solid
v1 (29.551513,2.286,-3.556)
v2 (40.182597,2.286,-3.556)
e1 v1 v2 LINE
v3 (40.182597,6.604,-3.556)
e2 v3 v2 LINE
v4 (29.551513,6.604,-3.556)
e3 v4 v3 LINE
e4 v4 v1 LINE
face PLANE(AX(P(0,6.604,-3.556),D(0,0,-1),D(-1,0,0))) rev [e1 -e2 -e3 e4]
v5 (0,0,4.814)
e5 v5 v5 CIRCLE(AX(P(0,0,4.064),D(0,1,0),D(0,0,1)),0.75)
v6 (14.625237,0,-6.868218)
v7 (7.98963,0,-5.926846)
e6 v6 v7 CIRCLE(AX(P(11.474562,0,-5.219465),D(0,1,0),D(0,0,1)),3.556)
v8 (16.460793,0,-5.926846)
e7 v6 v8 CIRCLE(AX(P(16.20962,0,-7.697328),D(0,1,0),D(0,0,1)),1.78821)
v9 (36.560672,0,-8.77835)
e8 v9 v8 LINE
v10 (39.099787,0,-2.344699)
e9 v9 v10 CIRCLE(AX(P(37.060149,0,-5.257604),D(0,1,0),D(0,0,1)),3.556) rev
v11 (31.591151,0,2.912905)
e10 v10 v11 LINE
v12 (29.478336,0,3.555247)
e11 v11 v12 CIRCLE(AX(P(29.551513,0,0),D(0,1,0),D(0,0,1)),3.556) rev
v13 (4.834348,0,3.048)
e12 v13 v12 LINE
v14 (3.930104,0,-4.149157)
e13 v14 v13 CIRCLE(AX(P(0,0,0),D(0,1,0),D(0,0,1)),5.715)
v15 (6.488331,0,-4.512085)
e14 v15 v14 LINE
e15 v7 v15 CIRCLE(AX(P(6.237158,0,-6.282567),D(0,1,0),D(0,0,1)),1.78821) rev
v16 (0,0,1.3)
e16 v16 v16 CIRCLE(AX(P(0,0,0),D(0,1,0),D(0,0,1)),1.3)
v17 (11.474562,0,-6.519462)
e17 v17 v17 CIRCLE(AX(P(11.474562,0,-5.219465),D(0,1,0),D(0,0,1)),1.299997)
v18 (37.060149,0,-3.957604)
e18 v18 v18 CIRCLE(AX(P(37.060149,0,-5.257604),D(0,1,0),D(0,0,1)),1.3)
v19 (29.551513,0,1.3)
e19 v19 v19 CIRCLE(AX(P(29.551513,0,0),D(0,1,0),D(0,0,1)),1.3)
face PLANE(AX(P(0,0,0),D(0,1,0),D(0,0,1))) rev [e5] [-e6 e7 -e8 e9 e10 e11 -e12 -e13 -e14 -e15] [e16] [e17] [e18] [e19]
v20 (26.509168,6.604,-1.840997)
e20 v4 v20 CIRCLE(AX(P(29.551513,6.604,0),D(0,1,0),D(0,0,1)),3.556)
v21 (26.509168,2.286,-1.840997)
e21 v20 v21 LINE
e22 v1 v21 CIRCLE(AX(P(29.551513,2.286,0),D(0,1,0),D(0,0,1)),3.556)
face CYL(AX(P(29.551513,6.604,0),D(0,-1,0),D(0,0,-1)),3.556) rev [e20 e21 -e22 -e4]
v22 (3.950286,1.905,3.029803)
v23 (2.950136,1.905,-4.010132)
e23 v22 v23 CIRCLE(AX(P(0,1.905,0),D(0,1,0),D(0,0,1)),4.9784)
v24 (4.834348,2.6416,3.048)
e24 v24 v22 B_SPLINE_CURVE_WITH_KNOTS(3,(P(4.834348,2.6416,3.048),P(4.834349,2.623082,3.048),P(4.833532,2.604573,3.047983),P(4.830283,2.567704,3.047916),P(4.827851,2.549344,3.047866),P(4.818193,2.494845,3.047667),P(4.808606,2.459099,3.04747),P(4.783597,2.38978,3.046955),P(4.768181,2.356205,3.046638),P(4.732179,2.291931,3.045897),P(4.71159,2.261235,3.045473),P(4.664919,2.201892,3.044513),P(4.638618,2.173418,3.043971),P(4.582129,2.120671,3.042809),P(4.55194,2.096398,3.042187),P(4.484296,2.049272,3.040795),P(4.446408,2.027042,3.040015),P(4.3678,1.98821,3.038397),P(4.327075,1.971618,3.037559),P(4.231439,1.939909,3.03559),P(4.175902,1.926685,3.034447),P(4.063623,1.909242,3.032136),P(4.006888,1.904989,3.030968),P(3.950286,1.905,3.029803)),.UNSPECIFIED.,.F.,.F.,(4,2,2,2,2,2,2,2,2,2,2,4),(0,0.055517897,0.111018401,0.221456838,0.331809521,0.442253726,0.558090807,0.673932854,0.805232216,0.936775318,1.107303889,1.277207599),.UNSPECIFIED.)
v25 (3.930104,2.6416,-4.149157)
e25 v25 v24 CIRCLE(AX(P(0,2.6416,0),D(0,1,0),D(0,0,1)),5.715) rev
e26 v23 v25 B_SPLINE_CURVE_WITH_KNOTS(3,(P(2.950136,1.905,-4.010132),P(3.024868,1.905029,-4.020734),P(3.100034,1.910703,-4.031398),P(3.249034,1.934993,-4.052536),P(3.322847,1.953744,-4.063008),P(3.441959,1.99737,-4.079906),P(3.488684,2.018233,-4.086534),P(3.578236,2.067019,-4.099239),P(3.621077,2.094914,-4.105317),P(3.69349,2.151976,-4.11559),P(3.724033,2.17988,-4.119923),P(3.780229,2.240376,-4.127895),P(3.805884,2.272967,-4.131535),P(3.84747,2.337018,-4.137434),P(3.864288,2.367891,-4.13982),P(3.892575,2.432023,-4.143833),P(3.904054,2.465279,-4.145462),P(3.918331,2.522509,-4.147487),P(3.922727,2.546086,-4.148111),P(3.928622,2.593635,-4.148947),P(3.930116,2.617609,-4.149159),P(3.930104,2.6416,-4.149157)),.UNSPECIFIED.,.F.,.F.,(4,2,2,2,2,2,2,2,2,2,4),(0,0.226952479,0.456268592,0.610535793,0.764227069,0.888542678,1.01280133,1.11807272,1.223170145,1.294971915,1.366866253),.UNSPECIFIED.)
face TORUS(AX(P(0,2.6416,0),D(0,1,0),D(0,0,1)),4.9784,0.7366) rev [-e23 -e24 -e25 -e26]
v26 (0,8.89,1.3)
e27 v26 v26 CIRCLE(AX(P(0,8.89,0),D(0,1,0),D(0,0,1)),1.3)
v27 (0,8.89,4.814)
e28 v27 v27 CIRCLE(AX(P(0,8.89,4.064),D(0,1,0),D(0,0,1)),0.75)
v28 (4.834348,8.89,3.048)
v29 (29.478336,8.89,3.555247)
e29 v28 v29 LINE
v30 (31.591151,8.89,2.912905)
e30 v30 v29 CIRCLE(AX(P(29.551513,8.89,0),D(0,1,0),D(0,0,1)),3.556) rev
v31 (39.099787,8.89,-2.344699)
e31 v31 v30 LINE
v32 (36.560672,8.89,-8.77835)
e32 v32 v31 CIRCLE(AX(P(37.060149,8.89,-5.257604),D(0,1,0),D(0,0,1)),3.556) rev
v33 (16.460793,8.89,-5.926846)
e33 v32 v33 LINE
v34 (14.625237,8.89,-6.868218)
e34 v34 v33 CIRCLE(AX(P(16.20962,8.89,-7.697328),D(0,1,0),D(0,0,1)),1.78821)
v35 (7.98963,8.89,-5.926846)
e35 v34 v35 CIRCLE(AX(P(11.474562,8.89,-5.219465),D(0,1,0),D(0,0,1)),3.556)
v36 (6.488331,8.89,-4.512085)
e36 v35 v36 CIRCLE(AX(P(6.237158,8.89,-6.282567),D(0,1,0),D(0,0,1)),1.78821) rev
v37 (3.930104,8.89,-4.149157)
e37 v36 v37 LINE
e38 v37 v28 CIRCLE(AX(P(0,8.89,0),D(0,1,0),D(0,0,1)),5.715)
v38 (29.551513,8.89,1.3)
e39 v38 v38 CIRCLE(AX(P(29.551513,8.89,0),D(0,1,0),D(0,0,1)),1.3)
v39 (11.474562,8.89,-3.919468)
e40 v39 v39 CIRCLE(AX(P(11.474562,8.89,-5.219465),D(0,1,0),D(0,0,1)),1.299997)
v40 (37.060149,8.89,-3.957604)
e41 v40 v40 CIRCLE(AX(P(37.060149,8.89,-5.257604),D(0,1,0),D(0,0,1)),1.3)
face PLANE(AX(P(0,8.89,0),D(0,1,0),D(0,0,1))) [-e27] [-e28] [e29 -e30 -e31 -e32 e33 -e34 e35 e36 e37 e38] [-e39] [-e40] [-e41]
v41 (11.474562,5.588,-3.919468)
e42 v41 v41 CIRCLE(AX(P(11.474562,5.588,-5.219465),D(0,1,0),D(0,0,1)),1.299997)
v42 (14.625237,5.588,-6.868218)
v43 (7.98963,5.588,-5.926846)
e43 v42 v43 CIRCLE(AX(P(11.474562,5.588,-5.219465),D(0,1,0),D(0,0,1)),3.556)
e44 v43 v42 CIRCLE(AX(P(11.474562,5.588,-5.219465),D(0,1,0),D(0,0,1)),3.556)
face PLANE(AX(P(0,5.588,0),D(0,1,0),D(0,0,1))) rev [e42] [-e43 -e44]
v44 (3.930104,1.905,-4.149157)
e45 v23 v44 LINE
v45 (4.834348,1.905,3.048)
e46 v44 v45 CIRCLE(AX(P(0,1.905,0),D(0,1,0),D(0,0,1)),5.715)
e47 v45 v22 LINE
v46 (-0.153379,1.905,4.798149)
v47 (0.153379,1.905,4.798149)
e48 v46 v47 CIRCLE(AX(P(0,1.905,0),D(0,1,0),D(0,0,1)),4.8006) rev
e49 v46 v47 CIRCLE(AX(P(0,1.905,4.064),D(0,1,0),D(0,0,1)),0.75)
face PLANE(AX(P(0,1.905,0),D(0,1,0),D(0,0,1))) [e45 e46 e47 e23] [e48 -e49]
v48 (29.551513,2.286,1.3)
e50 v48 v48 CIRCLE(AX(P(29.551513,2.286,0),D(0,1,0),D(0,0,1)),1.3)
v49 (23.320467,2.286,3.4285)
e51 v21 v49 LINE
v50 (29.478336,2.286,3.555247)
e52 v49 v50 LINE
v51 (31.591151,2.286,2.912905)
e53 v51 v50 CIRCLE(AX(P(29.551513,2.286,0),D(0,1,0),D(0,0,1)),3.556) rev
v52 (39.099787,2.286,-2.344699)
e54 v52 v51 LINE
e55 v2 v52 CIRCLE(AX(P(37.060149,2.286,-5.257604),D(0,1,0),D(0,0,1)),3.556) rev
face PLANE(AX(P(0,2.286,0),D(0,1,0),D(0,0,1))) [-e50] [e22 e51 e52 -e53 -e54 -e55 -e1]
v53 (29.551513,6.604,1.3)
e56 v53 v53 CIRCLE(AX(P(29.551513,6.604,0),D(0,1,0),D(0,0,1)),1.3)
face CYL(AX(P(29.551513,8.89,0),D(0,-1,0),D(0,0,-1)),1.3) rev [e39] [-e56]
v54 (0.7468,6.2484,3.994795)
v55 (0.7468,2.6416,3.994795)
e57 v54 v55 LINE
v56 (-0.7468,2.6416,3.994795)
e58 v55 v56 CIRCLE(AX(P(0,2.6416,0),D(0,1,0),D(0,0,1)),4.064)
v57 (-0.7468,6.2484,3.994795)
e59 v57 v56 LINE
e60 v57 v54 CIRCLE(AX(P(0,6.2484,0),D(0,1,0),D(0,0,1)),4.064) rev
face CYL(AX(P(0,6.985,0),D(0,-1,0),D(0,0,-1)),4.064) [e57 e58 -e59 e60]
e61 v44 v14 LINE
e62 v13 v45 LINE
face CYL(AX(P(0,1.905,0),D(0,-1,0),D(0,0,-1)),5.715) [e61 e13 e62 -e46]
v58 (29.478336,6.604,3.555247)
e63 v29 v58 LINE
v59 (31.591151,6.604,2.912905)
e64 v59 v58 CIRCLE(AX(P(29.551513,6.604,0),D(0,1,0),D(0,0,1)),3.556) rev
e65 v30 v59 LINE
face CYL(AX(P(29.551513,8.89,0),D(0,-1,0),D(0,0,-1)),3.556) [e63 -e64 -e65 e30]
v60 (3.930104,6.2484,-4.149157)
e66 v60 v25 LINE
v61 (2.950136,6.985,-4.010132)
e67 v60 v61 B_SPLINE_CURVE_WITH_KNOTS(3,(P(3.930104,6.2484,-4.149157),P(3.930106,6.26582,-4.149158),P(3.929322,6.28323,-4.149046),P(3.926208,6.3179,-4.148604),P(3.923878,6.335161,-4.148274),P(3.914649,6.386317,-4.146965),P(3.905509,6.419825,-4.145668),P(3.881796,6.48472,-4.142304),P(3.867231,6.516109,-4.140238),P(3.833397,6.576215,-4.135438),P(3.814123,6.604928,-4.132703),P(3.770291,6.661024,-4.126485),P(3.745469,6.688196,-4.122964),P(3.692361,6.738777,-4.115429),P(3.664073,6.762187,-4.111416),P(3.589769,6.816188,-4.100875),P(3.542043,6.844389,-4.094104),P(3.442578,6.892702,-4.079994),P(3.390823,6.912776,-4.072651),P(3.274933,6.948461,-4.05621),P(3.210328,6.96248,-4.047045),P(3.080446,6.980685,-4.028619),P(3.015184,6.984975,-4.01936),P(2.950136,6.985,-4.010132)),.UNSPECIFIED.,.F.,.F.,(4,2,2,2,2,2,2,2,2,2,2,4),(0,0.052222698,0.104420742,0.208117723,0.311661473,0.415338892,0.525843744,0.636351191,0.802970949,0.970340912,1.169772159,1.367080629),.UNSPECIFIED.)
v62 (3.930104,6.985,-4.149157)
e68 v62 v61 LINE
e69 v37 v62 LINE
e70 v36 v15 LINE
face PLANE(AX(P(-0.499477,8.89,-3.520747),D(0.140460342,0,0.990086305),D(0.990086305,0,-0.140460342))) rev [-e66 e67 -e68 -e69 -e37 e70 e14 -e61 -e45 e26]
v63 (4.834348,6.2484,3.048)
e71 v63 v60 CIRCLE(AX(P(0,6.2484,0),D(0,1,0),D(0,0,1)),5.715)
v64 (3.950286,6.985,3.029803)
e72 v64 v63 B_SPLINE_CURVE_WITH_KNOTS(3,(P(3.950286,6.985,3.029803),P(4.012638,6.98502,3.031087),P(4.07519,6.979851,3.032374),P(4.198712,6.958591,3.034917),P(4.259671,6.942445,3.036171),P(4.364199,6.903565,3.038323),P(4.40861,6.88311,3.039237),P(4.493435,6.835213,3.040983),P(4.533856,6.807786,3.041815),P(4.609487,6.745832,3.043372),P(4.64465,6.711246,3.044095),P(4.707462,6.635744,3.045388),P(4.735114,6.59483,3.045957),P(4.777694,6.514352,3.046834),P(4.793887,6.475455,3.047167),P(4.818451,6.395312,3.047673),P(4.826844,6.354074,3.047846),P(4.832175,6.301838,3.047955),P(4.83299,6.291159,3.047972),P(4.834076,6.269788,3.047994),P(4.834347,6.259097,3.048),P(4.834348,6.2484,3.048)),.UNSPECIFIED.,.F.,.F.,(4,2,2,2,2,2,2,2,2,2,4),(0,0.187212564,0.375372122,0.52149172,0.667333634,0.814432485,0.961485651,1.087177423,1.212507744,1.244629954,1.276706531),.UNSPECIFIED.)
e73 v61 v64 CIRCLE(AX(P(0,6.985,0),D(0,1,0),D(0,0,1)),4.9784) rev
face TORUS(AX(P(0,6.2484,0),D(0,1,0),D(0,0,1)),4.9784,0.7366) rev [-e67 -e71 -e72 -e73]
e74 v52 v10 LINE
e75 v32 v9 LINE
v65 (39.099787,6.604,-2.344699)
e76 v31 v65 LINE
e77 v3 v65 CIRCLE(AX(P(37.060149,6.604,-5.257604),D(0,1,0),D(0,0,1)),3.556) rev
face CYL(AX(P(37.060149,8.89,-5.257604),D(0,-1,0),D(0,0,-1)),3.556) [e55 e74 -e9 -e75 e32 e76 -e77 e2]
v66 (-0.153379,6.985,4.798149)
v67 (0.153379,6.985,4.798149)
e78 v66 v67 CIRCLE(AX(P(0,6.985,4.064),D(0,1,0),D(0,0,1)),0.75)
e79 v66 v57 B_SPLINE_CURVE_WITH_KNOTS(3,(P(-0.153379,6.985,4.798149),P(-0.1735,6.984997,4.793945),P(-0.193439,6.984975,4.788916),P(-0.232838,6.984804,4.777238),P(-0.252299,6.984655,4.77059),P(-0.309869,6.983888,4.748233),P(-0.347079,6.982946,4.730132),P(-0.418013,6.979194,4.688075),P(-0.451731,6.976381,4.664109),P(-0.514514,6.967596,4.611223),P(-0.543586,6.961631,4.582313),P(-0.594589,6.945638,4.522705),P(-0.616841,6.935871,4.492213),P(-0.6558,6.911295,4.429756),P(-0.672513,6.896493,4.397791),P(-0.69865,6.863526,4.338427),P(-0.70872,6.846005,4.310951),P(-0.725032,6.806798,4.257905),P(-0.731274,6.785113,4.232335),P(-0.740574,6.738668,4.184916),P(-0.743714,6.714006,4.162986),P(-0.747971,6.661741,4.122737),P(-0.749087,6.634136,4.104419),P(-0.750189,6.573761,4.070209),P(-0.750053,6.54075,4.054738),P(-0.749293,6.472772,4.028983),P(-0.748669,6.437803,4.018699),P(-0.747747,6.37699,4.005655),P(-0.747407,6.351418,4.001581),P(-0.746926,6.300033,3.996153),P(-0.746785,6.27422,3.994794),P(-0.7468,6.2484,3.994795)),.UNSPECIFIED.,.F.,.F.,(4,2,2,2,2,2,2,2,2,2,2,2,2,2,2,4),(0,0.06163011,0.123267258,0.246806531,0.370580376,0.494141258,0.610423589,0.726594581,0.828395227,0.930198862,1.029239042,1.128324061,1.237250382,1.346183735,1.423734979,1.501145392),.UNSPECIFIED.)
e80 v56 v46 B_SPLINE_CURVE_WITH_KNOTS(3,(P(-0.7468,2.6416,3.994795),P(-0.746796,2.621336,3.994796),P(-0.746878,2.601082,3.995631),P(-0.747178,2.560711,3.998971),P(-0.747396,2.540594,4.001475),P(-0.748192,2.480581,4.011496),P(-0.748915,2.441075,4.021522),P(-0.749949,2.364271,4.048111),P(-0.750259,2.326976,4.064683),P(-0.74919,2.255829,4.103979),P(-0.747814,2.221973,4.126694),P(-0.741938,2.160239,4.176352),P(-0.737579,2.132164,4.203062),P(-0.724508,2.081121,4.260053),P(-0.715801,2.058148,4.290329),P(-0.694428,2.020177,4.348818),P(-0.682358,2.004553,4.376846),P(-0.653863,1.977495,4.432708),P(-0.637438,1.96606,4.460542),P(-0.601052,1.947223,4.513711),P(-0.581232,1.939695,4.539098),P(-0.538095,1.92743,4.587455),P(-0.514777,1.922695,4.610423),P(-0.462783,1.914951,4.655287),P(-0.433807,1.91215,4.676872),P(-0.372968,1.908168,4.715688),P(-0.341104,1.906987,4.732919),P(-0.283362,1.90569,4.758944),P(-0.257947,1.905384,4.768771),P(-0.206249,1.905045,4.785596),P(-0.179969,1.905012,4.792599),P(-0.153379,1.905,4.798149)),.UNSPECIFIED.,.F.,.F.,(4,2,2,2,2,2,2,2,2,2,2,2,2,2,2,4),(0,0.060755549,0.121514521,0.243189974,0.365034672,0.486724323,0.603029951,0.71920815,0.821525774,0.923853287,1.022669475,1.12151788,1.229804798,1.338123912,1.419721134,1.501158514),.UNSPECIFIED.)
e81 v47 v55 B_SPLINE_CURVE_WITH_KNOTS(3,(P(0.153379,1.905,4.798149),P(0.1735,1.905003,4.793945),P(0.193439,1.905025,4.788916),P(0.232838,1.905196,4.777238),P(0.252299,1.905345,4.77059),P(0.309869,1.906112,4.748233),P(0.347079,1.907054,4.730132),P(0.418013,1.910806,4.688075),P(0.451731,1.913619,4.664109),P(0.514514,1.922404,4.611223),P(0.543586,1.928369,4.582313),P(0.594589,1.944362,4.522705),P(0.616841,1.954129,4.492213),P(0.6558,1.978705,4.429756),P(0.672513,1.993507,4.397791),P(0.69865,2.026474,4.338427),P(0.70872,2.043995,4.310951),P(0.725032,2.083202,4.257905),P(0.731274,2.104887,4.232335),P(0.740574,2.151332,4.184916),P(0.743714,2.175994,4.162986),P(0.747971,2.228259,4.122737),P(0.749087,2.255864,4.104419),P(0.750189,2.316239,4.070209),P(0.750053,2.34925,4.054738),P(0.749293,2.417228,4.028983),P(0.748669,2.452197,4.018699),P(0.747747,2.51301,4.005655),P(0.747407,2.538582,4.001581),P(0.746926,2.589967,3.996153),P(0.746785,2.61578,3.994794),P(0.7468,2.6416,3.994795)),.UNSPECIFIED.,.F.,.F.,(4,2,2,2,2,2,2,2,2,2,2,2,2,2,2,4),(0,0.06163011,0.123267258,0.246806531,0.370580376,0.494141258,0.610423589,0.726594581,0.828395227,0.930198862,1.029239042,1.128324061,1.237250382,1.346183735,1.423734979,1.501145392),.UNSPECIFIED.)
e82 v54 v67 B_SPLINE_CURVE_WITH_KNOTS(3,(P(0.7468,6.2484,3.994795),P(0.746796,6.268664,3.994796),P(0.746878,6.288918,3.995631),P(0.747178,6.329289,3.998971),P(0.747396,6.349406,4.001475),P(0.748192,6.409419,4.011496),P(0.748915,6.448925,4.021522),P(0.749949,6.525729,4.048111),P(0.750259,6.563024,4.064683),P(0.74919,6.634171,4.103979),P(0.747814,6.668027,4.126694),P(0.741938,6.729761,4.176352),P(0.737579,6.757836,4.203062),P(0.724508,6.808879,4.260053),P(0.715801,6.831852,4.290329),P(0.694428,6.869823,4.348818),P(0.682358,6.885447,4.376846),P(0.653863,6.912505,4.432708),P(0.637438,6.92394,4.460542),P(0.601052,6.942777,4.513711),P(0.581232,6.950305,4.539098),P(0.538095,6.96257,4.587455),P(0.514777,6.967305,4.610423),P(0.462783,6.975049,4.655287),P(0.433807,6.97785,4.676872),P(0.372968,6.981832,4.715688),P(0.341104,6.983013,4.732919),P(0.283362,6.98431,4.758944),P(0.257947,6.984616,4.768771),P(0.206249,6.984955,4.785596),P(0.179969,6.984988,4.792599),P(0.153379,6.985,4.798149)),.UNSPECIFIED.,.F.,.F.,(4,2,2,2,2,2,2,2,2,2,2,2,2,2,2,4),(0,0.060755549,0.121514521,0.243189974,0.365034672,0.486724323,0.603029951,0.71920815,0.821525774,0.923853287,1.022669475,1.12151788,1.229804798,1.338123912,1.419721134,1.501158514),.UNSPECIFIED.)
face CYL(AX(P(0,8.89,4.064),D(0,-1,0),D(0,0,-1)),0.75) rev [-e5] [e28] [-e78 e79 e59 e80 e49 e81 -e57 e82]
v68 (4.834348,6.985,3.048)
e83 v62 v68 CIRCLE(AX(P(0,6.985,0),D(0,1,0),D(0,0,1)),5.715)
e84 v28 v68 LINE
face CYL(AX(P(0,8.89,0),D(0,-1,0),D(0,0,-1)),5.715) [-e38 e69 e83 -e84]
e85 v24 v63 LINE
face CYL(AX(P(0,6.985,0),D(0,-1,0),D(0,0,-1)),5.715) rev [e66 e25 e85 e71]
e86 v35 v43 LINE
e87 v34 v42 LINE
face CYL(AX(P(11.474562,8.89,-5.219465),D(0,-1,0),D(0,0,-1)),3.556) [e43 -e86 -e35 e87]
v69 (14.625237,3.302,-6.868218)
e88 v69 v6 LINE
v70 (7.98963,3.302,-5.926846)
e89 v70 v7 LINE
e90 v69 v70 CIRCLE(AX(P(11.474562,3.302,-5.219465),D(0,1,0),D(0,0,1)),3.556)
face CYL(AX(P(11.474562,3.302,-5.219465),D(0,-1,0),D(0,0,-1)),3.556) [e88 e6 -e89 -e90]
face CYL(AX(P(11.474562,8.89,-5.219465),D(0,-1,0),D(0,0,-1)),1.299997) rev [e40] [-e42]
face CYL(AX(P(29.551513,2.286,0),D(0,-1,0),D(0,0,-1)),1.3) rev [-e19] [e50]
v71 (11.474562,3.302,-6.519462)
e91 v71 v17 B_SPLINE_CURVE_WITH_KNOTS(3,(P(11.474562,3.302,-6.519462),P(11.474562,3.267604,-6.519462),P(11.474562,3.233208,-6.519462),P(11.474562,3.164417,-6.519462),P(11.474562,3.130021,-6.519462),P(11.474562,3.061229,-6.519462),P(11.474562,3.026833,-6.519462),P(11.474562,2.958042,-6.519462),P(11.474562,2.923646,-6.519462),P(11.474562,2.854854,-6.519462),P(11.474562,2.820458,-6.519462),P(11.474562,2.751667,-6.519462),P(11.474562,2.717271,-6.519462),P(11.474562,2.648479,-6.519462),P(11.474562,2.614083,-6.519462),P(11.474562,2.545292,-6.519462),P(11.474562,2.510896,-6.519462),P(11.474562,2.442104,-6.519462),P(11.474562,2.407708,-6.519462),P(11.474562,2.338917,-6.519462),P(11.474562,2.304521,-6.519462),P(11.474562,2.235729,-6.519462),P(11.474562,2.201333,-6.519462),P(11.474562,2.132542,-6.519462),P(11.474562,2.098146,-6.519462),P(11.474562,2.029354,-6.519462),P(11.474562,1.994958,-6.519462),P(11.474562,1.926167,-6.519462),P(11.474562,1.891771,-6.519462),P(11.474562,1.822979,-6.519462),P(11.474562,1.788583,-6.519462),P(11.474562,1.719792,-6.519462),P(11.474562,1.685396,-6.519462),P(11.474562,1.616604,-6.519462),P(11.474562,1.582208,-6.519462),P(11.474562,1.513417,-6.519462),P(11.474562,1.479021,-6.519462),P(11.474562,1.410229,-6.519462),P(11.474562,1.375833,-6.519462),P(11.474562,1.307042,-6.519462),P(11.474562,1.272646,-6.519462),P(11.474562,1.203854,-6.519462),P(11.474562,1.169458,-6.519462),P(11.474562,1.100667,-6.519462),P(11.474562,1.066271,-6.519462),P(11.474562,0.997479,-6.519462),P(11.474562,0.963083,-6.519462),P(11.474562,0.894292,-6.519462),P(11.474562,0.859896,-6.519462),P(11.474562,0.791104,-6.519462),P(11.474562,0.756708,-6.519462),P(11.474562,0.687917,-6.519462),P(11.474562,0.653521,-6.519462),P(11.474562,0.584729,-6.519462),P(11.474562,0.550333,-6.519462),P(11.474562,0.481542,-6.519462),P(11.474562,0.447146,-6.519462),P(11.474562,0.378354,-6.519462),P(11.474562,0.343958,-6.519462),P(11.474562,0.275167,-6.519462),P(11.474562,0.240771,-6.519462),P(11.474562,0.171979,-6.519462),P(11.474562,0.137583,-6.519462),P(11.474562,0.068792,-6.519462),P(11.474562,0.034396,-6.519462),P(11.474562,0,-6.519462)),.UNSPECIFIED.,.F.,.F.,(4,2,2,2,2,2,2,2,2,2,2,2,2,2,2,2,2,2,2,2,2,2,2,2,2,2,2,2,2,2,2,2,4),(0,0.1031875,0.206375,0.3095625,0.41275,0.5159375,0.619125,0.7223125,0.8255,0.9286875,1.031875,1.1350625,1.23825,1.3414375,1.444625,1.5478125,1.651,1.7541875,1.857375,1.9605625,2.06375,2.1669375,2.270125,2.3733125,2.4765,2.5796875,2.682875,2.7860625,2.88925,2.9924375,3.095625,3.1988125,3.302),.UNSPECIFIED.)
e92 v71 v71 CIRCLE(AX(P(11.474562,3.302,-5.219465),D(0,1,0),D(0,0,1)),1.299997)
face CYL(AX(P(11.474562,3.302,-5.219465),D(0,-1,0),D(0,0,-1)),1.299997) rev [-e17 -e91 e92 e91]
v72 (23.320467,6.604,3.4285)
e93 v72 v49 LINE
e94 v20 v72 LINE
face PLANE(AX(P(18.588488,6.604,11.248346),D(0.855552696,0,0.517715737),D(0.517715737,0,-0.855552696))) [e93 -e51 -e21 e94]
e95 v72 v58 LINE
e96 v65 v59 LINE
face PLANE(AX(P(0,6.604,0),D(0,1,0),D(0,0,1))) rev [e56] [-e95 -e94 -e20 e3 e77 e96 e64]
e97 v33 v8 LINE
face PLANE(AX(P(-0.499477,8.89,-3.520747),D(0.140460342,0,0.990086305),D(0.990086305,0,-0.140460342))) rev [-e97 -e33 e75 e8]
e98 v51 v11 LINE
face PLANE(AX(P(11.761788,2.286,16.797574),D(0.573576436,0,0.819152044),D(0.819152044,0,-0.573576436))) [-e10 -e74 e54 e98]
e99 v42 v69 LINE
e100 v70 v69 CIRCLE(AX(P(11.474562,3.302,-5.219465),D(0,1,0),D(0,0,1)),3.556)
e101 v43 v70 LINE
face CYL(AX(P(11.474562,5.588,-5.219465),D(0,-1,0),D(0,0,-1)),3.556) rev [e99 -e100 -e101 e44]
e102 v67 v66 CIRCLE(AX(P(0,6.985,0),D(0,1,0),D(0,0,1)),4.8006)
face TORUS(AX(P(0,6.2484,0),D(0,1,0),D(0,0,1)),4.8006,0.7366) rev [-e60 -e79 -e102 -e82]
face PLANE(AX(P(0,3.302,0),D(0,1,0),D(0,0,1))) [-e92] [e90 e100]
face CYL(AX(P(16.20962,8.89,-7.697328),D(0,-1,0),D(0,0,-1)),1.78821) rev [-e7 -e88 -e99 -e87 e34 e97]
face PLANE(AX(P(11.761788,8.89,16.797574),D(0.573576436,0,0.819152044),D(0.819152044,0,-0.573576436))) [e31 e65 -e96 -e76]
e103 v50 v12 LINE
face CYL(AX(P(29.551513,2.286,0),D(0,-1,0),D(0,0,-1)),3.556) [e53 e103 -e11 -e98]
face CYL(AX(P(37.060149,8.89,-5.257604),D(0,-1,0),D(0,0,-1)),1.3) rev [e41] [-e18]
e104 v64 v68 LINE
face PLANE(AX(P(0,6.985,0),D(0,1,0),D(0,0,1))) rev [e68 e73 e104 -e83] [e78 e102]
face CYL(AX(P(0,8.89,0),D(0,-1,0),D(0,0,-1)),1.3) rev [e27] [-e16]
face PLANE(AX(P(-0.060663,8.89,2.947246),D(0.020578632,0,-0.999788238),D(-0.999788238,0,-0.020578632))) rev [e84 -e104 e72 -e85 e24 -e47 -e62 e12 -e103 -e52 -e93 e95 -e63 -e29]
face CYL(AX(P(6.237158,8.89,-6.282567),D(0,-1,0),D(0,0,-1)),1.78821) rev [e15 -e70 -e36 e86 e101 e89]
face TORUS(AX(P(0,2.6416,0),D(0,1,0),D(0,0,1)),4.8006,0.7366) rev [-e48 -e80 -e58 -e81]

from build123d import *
from build123d.topology import SkipClean

# Parameters (mm, degrees)
SKETCH1_R           = 1.3
SKETCH1_R_2         = 0.75
SKETCH1_R_3         = 1.2999974
BOSS_EXTRUDE1_DEPTH = 8.89
SKETCH1_3_R         = 5.715
SKETCH1_3_R_2       = 4.064
CUT_EXTRUDE1_DEPTH  = 6.985
BOSS_EXTRUDE2_DEPTH = 1.905
FILLET4_R           = 0.7366
SKETCH1_5_R         = 1.2999974
CUT_EXTRUDE2_DEPTH  = 5.588
SKETCH1_6_R         = 1.2999974
BOSS_EXTRUDE3_DEPTH = 3.302
CUT_EXTRUDE3_DEPTH  = 6.604
BOSS_EXTRUDE4_DEPTH = 2.286


with BuildPart() as part:
    # Sketch1 → Boss-Extrude1 (new body)
    with BuildSketch(Plane(origin=(0, 0, 0), x_dir=(1, 0, 0), z_dir=(0, 1, 0))):
        with BuildLine():
            ThreePointArc((3.930104201, 4.14915726), (-5.670420967, -0.712426178), (4.834348043, -3.048))
            Line((4.834348043, -3.048), (29.478335544, -3.555246973))
            ThreePointArc((29.478335544, -3.555246973), (30.585869157, -3.402240978), (31.591150968, -2.912904669))
            Line((31.591150968, -2.912904669), (39.099786947, 2.344698845))
            ThreePointArc((39.099786947, 2.344698845), (40.367866174, 6.563032187), (36.560672162, 8.778350417))
            Line((36.560672162, 8.778350417), (16.46079264, 5.926845507))
            ThreePointArc((16.46079264, 5.926845507), (15.393588111, 6.106168793), (14.625236588, 6.868217534))
            ThreePointArc((14.625236588, 6.868217534), (10.975084871, 8.740211971), (7.989630154, 5.926845507))
            ThreePointArc((7.989630154, 5.926845507), (7.463549388, 4.981159844), (6.488331058, 4.512084631))
            Line((6.488331058, 4.512084631), (3.930104201, 4.14915726))
        make_face()
        with Locations(Location((0, 0, 0), (0, 0, 270))):
            Circle(SKETCH1_R, mode=Mode.SUBTRACT)
        with Locations(Location((0, -4.064, 0), (0, 0, 270))):
            Circle(SKETCH1_R_2, mode=Mode.SUBTRACT)
        with Locations(Location((29.55151316, 0, 0), (0, 0, 270))):
            Circle(SKETCH1_R, mode=Mode.SUBTRACT)
        with Locations(Location((37.060149139, 5.257603514, 0), (0, 0, 270))):
            Circle(SKETCH1_R, mode=Mode.SUBTRACT)
        with Locations(Location((11.474561849, 5.219465069, 0), (0, 0, 270))):
            Circle(SKETCH1_R_3, mode=Mode.SUBTRACT)
    extrude(amount=BOSS_EXTRUDE1_DEPTH)

    # Sketch1<3> → Cut-Extrude1 (cut)
    with BuildSketch(Plane(origin=(0, 0, 0), x_dir=(1, 0, 0), z_dir=(0, 1, 0))):
        Circle(SKETCH1_3_R)
        Circle(SKETCH1_3_R_2, mode=Mode.SUBTRACT)
    extrude(amount=CUT_EXTRUDE1_DEPTH, mode=Mode.SUBTRACT)

    # Sketch1<4> → Boss-Extrude2 (add)
    with SkipClean():  # the faces are left unmerged after this step: merging them gives an invalid solid
        with BuildSketch(Plane(origin=(0, 0, 0), x_dir=(1, 0, 0), z_dir=(0, 1, 0))):
            with BuildLine():
                Line((5.715, 0), (4.064, 0))
                ThreePointArc((4.064, 0), (3.12658698, -2.596256894), (0.746800266, -3.994794783))
                ThreePointArc((0.746800266, -3.994794783), (0.74919964, -4.029360426), (0.75, -4.064))
                ThreePointArc((0.75, -4.064), (-0.034639574, -4.81319964), (-0.746800266, -3.994794783))
                ThreePointArc((-0.746800266, -3.994794783), (-2.80994126, 2.936039188), (4.023710745, 0.570830832))
                Line((4.023710745, 0.570830832), (5.658343236, 0.802730857))
                ThreePointArc((5.658343236, 0.802730857), (5.077816803, 2.622403768), (3.930104201, 4.14915726))
                ThreePointArc((3.930104201, 4.14915726), (-5.670420967, -0.712426178), (4.834348043, -3.048))
                ThreePointArc((4.834348043, -3.048), (5.490424577, -1.586336335), (5.715, 0))
            make_face()
            with BuildLine():
                ThreePointArc((4.023710745, 0.570830832), (4.053915174, 0.286125437), (4.064, 0))
                Line((4.064, 0), (5.715, 0))
                ThreePointArc((5.715, 0), (5.700818213, 0.402363896), (5.658343236, 0.802730857))
                Line((5.658343236, 0.802730857), (4.023710745, 0.570830832))
            make_face()
        extrude(amount=BOSS_EXTRUDE2_DEPTH)

    # Fillet4
    # the kernel refuses this fillet: 0.7366 mm, written as the material it adds along each edge
    with BuildSketch(Plane(origin=(0, 6.985, 0), x_dir=(0.0031415874858795557, 0, 0.9999950652018581), z_dir=(-0.9999950652018581, 0, 0.0031415874858795557))) as fillet4_piece_1_section:
        with BuildLine():
            CenterArc((4.064 + FILLET4_R, -FILLET4_R), FILLET4_R, 90, 90)
            Line((4.064, -FILLET4_R), (4.064, 0))
            Line((4.064, 0), (4.064 + FILLET4_R, 0))
        make_face()
    fillet4_piece_1 = revolve(axis=Axis((0, 6.985, 0), (0, 1, 0)), revolution_arc=359.64, mode=Mode.PRIVATE)
    fillet4_piece_1 = fillet4_piece_1 - Plane(origin=(0, 6.77936554, 4.064), x_dir=(0, 0, 1), z_dir=(0, -1, 0)) * Cylinder(0.75, 20, mode=Mode.PRIVATE)
    add(fillet4_piece_1)
    with BuildSketch(Plane(origin=(0, 6.985, 0), x_dir=(0.6333996635082028, 0, 0.7738248291879084), z_dir=(-0.7738248291879084, 0, 0.6333996635082028))) as fillet4_piece_2_section:
        with BuildLine():
            CenterArc((5.715 - FILLET4_R, -FILLET4_R), FILLET4_R, 0, 90)
            Line((5.715 - FILLET4_R, 0), (5.715, 0))
            Line((5.715, 0), (5.715, -FILLET4_R))
        make_face()
    fillet4_piece_2 = revolve(axis=Axis((0, 6.985, 0), (0, 1, 0)), revolution_arc=115.719345032, mode=Mode.PRIVATE)
    fillet4_piece_2 = split(fillet4_piece_2, bisect_by=Plane(origin=(4.95205857, 6.776121662, -4.294138621), z_dir=(0.14046034244219252, 0, 0.9900863054305024)), keep=Keep.TOP, mode=Mode.PRIVATE)
    fillet4_piece_2 = split(fillet4_piece_2, bisect_by=Plane(origin=(5.372477219, 6.776121662, 3.059076308), z_dir=(0.020578632283041045, 0, -0.9997882375250068)), keep=Keep.TOP, mode=Mode.PRIVATE)
    add(fillet4_piece_2)
    with BuildSketch(Plane(origin=(0, 1.905, 0), x_dir=(-0.00314158748587942, 0, 0.9999950652018581), z_dir=(0.9999950652018581, 0, 0.00314158748587942))) as fillet4_piece_3_section:
        with BuildLine():
            CenterArc((4.064 + FILLET4_R, -FILLET4_R), FILLET4_R, 90, 90)
            Line((4.064, -FILLET4_R), (4.064, 0))
            Line((4.064, 0), (4.064 + FILLET4_R, 0))
        make_face()
    fillet4_piece_3 = revolve(axis=Axis((0, 1.905, 0), (0, -1, 0)), revolution_arc=359.64, mode=Mode.PRIVATE)
    fillet4_piece_3 = fillet4_piece_3 - Plane(origin=(0, 2.11063446, 4.064), x_dir=(0, 0, 1), z_dir=(0, -1, 0)) * Cylinder(0.75, 20, mode=Mode.PRIVATE)
    add(fillet4_piece_3)
    with BuildSketch(Plane(origin=(0, 1.905, 0), x_dir=(0.6333996635081833, 0, 0.7738248291879242), z_dir=(-0.7738248291879242, 0, 0.6333996635081833))) as fillet4_piece_4_section:
        with BuildLine():
            CenterArc((5.715 - FILLET4_R, FILLET4_R), FILLET4_R, 270, 90)
            Line((5.715 - FILLET4_R, 0), (5.715, 0))
            Line((5.715, 0), (5.715, FILLET4_R))
        make_face()
    fillet4_piece_4 = revolve(axis=Axis((0, 1.905, 0), (0, 1, 0)), revolution_arc=115.719345032, mode=Mode.PRIVATE)
    fillet4_piece_4 = split(fillet4_piece_4, bisect_by=Plane(origin=(4.95205857, 2.113878338, -4.294138621), z_dir=(0.14046034244219252, 0, 0.9900863054305024)), keep=Keep.TOP, mode=Mode.PRIVATE)
    fillet4_piece_4 = split(fillet4_piece_4, bisect_by=Plane(origin=(5.372477219, 2.113878338, 3.059076308), z_dir=(0.020578632283041045, 0, -0.9997882375250068)), keep=Keep.TOP, mode=Mode.PRIVATE)
    add(fillet4_piece_4)

    # Sketch1<5> → Cut-Extrude2 (cut)
    with BuildSketch(Plane(origin=(0, 0, 0), x_dir=(1, 0, 0), z_dir=(0, 1, 0))):
        with BuildLine():
            ThreePointArc((7.989630154, 5.926845507), (8.886608895, 2.780687608), (11.974038645, 1.698718141))
            ThreePointArc((11.974038645, 1.698718141), (14.159824917, 2.888264036), (15.030561849, 5.219465069))
            ThreePointArc((15.030561849, 5.219465069), (14.927744104, 6.068386923), (14.625236588, 6.868217534))
            ThreePointArc((14.625236588, 6.868217534), (10.975084871, 8.740211971), (7.989630154, 5.926845507))
        make_face()
        with Locations(Location((11.474561849, 5.219465069, 0), (0, 0, 270))):
            Circle(SKETCH1_5_R, mode=Mode.SUBTRACT)
    extrude(amount=CUT_EXTRUDE2_DEPTH, mode=Mode.SUBTRACT)

    # Sketch1<6> → Boss-Extrude3 (add)
    with BuildSketch(Plane(origin=(0, 0, 0), x_dir=(1, 0, 0), z_dir=(0, 1, 0))):
        with BuildLine():
            ThreePointArc((7.989630154, 5.926845507), (8.886608895, 2.780687608), (11.974038645, 1.698718141))
            ThreePointArc((11.974038645, 1.698718141), (14.159824917, 2.888264036), (15.030561849, 5.219465069))
            ThreePointArc((15.030561849, 5.219465069), (14.927744104, 6.068386923), (14.625236588, 6.868217534))
            ThreePointArc((14.625236588, 6.868217534), (10.975084871, 8.740211971), (7.989630154, 5.926845507))
        make_face()
        with Locations(Location((11.474561849, 5.219465069, 0), (0, 0, 270))):
            Circle(SKETCH1_6_R, mode=Mode.SUBTRACT)
    extrude(amount=BOSS_EXTRUDE3_DEPTH)

    # Sketch1<7> → Cut-Extrude3 (cut)
    with BuildSketch(Plane(origin=(0, 0, 0), x_dir=(1, 0, 0), z_dir=(0, 1, 0))):
        with BuildLine():
            Line((25.99551316, 0), (25.395135631, 0))
            Line((25.395135631, 0), (23.320467154, -3.428499623))
            Line((23.320467154, -3.428499623), (29.478335544, -3.555246973))
            ThreePointArc((29.478335544, -3.555246973), (27.011301003, -2.488465028), (25.99551316, 0))
        make_face()
        with BuildLine():
            Line((34.630007472, 3.556), (29.55151316, 3.556))
            ThreePointArc((29.55151316, 3.556), (31.193491229, 3.154210523), (32.464417829, 2.039637808))
            Line((32.464417829, 2.039637808), (34.630007472, 3.556))
        make_face()
        with BuildLine():
            ThreePointArc((26.509167773, 1.840997161), (26.12633315, 0.955655745), (25.99551316, 0))
            Line((25.99551316, 0), (28.25151316, 0))
            ThreePointArc((28.25151316, 0), (29.160595621, 1.239832036), (30.616410818, 0.745649367))
            Line((30.616410818, 0.745649367), (32.464417829, 2.039637808))
            ThreePointArc((32.464417829, 2.039637808), (31.193491229, 3.154210523), (29.55151316, 3.556))
            ThreePointArc((29.55151316, 3.556), (27.805295806, 3.097718669), (26.509167773, 1.840997161))
        make_face()
        with BuildLine():
            Line((28.25151316, 0), (25.99551316, 0))
            ThreePointArc((25.99551316, 0), (27.011301003, -2.488465028), (29.478335544, -3.555246973))
            ThreePointArc((29.478335544, -3.555246973), (30.585869157, -3.402240978), (31.591150968, -2.912904669))
            ThreePointArc((31.591150968, -2.912904669), (32.705723683, -1.641978069), (33.10751316, 0))
            ThreePointArc((33.10751316, 0), (32.942930637, 1.069309823), (32.464417829, 2.039637808))
            Line((32.464417829, 2.039637808), (30.616410818, 0.745649367))
            ThreePointArc((30.616410818, 0.745649367), (30.791345196, 0.390917539), (30.85151316, 0))
            ThreePointArc((30.85151316, 0), (29.55151316, -1.3), (28.25151316, 0))
        make_face()
        with BuildLine():
            ThreePointArc((33.10751316, 0), (32.705723683, -1.641978069), (31.591150968, -2.912904669))
            Line((31.591150968, -2.912904669), (39.099786947, 2.344698845))
            ThreePointArc((39.099786947, 2.344698845), (39.711298905, 2.887679271), (40.182597134, 3.556))
            Line((40.182597134, 3.556), (34.630007472, 3.556))
            Line((34.630007472, 3.556), (32.464417829, 2.039637808))
            ThreePointArc((32.464417829, 2.039637808), (32.942930637, 1.069309823), (33.10751316, 0))
        make_face()
        with BuildLine():
            Line((26.509167773, 1.840997161), (25.395135631, 0))
            Line((25.395135631, 0), (25.99551316, 0))
            ThreePointArc((25.99551316, 0), (26.12633315, 0.955655745), (26.509167773, 1.840997161))
        make_face()
    extrude(amount=CUT_EXTRUDE3_DEPTH, mode=Mode.SUBTRACT)

    # Sketch1<8> → Boss-Extrude4 (add)
    with BuildSketch(Plane(origin=(0, 0, 0), x_dir=(1, 0, 0), z_dir=(0, 1, 0))):
        with BuildLine():
            Line((34.630007472, 3.556), (29.55151316, 3.556))
            ThreePointArc((29.55151316, 3.556), (31.193491229, 3.154210523), (32.464417829, 2.039637808))
            Line((32.464417829, 2.039637808), (34.630007472, 3.556))
        make_face()
        with BuildLine():
            ThreePointArc((26.509167773, 1.840997161), (26.12633315, 0.955655745), (25.99551316, 0))
            Line((25.99551316, 0), (28.25151316, 0))
            ThreePointArc((28.25151316, 0), (29.160595621, 1.239832036), (30.616410818, 0.745649367))
            Line((30.616410818, 0.745649367), (32.464417829, 2.039637808))
            ThreePointArc((32.464417829, 2.039637808), (31.193491229, 3.154210523), (29.55151316, 3.556))
            ThreePointArc((29.55151316, 3.556), (27.805295806, 3.097718669), (26.509167773, 1.840997161))
        make_face()
        with BuildLine():
            Line((28.25151316, 0), (25.99551316, 0))
            ThreePointArc((25.99551316, 0), (27.011301003, -2.488465028), (29.478335544, -3.555246973))
            ThreePointArc((29.478335544, -3.555246973), (30.585869157, -3.402240978), (31.591150968, -2.912904669))
            ThreePointArc((31.591150968, -2.912904669), (32.705723683, -1.641978069), (33.10751316, 0))
            ThreePointArc((33.10751316, 0), (32.942930637, 1.069309823), (32.464417829, 2.039637808))
            Line((32.464417829, 2.039637808), (30.616410818, 0.745649367))
            ThreePointArc((30.616410818, 0.745649367), (30.791345196, 0.390917539), (30.85151316, 0))
            ThreePointArc((30.85151316, 0), (29.55151316, -1.3), (28.25151316, 0))
        make_face()
        with BuildLine():
            Line((26.509167773, 1.840997161), (25.395135631, 0))
            Line((25.395135631, 0), (25.99551316, 0))
            ThreePointArc((25.99551316, 0), (26.12633315, 0.955655745), (26.509167773, 1.840997161))
        make_face()
        with BuildLine():
            Line((25.99551316, 0), (25.395135631, 0))
            Line((25.395135631, 0), (23.320467154, -3.428499623))
            Line((23.320467154, -3.428499623), (29.478335544, -3.555246973))
            ThreePointArc((29.478335544, -3.555246973), (27.011301003, -2.488465028), (25.99551316, 0))
        make_face()
        with BuildLine():
            ThreePointArc((33.10751316, 0), (32.705723683, -1.641978069), (31.591150968, -2.912904669))
            Line((31.591150968, -2.912904669), (39.099786947, 2.344698845))
            ThreePointArc((39.099786947, 2.344698845), (39.711298905, 2.887679271), (40.182597134, 3.556))
            Line((40.182597134, 3.556), (34.630007472, 3.556))
            Line((34.630007472, 3.556), (32.464417829, 2.039637808))
            ThreePointArc((32.464417829, 2.039637808), (32.942930637, 1.069309823), (33.10751316, 0))
        make_face()
    extrude(amount=BOSS_EXTRUDE4_DEPTH)


solid = part.part
